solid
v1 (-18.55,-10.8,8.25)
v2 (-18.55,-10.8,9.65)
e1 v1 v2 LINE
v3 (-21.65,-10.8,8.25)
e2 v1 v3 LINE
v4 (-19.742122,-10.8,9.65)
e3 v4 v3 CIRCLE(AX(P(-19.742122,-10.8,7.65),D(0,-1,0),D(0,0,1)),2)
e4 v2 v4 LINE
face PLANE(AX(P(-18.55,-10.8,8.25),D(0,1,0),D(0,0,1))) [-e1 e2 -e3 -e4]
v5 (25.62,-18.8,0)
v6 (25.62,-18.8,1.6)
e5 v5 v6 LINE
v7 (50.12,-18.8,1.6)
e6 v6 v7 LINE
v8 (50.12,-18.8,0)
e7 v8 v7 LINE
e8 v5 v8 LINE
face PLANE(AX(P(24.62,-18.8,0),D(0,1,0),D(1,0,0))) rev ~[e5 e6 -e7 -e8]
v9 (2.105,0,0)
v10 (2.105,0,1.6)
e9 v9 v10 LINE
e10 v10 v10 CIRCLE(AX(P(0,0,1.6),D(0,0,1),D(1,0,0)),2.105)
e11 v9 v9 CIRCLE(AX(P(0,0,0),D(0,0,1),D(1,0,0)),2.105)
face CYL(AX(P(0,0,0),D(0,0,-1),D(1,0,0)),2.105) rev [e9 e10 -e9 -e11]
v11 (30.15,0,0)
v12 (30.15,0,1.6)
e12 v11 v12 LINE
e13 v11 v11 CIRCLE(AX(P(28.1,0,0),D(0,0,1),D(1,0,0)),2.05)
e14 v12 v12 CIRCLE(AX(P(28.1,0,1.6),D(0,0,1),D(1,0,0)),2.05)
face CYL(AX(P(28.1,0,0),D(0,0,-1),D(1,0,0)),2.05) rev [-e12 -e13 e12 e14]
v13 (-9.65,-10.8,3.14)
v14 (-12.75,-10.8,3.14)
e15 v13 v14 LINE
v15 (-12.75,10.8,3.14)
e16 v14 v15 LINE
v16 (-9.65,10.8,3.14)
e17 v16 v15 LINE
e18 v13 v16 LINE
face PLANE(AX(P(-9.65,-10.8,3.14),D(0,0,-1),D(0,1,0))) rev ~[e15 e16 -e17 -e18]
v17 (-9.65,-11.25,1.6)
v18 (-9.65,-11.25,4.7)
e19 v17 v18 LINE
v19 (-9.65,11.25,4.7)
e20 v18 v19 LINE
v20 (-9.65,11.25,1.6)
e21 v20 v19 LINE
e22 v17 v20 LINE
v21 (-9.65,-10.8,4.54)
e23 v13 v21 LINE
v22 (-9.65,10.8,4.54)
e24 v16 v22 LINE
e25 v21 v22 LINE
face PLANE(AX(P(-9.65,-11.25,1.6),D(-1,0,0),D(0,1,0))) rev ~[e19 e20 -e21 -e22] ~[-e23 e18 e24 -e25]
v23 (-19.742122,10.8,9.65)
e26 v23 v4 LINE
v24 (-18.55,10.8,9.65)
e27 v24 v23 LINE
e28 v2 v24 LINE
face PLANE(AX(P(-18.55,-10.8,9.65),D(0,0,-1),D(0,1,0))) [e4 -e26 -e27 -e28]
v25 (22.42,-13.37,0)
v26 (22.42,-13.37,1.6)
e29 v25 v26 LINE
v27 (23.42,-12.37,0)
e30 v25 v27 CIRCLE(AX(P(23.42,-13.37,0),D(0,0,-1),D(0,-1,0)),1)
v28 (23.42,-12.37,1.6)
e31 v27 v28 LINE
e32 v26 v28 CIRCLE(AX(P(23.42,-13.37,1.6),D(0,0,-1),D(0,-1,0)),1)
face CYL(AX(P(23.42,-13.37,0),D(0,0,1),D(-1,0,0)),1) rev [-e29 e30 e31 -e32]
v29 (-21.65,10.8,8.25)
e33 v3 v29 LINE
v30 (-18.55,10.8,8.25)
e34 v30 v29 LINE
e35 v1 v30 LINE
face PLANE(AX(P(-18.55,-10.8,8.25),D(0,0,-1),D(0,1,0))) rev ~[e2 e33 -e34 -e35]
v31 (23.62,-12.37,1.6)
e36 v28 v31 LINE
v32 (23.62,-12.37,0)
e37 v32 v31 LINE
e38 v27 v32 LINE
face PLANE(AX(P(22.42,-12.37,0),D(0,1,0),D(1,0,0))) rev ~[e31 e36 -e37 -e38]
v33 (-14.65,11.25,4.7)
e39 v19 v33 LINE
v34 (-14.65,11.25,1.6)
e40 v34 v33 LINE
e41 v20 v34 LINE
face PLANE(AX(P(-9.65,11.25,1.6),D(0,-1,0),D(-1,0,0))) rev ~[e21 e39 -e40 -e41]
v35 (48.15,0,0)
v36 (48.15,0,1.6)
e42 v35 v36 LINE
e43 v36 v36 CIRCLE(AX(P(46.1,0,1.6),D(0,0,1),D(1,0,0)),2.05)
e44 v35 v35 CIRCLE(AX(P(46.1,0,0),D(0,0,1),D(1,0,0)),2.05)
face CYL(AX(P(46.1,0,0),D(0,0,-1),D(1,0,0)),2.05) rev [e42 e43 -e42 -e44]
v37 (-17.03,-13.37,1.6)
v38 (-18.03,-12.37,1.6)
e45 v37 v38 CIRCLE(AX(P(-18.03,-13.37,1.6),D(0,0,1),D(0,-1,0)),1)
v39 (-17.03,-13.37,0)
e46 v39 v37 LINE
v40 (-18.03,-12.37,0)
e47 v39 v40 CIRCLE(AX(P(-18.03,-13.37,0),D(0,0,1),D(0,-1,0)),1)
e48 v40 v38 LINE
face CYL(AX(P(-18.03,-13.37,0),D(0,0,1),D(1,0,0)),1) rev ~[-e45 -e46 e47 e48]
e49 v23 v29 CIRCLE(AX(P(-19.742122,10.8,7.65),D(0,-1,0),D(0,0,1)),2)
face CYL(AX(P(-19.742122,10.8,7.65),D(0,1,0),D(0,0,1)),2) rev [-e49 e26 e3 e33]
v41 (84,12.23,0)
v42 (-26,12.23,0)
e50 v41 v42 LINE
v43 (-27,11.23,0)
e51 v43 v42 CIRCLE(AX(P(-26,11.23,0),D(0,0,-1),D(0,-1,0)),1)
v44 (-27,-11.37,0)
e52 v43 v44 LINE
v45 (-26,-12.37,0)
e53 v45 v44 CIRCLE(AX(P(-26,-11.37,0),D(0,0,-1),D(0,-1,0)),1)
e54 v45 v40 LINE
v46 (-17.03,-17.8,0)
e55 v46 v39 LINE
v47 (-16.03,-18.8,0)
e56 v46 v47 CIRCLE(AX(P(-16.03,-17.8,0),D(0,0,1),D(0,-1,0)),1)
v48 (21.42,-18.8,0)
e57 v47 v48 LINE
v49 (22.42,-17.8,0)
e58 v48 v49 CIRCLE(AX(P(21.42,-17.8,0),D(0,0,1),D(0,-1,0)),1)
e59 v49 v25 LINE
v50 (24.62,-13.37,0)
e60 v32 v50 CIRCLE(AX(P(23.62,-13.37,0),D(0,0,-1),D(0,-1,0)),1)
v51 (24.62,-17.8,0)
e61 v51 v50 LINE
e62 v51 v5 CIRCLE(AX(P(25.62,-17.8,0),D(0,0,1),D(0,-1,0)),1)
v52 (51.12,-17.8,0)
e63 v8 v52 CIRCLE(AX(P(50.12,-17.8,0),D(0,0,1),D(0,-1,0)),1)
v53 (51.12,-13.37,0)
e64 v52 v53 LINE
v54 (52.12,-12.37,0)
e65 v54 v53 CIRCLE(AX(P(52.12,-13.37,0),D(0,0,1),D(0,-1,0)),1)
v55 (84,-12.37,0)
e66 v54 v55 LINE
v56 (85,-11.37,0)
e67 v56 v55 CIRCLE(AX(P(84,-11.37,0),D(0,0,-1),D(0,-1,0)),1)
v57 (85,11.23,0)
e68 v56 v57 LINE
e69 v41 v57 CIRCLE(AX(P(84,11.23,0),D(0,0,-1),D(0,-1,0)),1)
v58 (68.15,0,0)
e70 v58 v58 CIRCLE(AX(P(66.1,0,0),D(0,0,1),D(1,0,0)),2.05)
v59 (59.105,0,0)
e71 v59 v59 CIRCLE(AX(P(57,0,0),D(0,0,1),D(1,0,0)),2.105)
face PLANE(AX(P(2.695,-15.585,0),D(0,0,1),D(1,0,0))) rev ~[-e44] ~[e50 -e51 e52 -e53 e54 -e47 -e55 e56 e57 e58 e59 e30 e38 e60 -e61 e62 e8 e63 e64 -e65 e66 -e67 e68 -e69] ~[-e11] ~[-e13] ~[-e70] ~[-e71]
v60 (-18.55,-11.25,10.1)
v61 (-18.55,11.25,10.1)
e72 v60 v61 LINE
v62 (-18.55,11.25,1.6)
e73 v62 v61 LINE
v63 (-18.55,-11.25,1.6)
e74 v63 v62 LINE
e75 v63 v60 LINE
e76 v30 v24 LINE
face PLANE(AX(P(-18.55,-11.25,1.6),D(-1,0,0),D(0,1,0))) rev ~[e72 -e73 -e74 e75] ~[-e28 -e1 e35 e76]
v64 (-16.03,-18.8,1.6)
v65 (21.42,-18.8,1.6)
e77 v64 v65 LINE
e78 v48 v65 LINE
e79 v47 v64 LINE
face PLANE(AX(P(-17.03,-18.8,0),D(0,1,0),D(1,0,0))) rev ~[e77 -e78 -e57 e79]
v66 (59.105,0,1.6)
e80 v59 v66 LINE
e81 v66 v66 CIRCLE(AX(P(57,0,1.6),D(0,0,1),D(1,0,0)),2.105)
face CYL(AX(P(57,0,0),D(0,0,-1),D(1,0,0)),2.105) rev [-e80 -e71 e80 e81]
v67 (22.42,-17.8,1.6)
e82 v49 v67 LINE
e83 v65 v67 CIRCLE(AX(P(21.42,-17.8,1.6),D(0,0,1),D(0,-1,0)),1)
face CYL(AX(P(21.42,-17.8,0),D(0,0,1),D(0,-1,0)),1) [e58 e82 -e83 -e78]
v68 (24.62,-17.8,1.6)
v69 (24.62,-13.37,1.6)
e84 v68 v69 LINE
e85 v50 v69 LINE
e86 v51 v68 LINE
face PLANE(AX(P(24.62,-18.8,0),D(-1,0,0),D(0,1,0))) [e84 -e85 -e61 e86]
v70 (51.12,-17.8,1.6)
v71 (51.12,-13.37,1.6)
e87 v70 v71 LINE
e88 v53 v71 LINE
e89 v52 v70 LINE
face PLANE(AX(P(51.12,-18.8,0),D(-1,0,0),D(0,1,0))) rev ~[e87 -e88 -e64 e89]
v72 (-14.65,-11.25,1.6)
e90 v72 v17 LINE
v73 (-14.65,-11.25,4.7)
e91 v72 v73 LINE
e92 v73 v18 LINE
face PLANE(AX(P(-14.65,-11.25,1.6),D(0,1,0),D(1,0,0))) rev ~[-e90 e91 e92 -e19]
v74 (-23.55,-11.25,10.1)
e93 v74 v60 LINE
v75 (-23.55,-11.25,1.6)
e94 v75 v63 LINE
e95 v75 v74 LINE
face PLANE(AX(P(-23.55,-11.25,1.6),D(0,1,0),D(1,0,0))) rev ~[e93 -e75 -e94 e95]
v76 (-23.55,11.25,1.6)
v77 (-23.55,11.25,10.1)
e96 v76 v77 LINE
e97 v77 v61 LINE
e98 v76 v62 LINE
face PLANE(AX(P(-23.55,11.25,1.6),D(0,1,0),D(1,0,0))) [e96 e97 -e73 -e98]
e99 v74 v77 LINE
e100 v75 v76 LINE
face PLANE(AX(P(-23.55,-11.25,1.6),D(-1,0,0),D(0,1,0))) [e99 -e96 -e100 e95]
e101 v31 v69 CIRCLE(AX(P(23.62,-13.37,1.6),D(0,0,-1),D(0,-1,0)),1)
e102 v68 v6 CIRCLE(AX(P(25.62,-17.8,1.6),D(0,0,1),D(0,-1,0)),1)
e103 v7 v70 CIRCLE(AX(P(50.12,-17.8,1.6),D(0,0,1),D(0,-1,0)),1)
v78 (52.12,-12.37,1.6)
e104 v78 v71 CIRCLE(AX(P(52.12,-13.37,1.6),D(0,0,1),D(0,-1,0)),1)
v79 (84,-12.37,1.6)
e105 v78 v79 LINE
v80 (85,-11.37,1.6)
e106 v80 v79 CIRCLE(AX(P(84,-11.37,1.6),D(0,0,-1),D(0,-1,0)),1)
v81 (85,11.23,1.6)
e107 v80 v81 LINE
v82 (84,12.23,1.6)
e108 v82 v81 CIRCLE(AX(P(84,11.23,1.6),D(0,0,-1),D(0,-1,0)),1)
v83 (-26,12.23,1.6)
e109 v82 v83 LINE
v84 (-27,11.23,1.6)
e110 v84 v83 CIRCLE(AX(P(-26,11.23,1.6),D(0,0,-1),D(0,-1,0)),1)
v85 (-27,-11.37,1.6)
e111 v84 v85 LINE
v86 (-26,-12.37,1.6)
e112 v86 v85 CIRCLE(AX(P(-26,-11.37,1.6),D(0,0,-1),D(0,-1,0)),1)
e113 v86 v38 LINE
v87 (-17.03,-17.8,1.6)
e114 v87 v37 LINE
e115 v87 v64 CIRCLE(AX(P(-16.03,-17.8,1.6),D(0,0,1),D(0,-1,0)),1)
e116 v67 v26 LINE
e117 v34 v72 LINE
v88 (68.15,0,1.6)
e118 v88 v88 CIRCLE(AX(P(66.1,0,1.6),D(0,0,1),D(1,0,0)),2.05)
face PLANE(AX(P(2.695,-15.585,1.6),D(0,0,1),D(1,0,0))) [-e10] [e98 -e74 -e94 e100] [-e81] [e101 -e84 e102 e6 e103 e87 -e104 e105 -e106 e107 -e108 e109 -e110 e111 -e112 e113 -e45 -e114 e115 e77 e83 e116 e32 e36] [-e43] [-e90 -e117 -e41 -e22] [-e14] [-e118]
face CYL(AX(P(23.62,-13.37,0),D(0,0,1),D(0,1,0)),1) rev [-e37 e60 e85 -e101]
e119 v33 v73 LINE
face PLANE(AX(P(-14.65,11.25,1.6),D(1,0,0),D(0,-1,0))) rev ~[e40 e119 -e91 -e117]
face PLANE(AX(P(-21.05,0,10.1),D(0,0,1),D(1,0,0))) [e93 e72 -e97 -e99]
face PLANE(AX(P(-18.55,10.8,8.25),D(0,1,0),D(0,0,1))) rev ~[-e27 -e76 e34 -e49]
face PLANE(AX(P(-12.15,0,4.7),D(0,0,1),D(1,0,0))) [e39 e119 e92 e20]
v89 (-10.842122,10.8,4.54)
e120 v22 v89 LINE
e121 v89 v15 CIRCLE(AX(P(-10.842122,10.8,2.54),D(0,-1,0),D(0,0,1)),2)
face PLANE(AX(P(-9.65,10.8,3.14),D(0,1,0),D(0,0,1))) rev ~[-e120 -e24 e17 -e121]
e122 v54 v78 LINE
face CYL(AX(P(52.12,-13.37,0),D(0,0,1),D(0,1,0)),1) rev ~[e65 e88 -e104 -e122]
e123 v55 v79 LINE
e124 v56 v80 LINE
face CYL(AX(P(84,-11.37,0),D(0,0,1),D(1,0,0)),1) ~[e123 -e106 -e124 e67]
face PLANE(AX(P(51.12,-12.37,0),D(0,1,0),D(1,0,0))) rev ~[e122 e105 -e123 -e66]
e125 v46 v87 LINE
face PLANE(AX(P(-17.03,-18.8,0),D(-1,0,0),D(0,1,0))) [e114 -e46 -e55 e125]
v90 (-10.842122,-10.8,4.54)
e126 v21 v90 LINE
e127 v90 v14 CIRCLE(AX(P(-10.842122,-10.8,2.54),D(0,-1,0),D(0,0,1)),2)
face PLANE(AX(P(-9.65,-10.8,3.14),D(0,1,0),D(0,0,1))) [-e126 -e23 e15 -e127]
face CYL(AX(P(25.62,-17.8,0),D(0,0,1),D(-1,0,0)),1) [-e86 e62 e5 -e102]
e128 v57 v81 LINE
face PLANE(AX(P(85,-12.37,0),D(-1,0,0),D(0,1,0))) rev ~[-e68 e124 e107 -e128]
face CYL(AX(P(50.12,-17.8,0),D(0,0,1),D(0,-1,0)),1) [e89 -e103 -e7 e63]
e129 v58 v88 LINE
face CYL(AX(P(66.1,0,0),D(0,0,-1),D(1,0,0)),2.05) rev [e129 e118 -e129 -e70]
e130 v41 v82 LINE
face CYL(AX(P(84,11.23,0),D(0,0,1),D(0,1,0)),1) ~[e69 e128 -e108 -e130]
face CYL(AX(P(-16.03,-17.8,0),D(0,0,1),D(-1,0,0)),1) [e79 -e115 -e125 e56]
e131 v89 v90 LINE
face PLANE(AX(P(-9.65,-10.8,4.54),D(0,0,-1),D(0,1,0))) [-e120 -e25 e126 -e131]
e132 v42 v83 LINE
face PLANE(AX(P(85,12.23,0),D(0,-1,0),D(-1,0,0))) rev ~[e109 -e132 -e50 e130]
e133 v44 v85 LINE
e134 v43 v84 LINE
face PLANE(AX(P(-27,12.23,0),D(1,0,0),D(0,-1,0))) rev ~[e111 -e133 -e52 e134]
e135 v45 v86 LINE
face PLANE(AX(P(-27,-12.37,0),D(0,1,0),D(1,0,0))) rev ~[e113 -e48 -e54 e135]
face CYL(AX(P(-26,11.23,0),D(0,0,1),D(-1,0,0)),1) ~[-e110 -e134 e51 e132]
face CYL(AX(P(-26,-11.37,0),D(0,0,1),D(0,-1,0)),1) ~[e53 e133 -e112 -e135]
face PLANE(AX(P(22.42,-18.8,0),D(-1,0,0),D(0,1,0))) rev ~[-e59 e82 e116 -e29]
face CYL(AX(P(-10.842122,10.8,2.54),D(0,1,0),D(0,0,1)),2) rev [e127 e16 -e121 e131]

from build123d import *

# Parameters (mm, degrees)
F4_W         = 39.45
F4_H         = 6.43
F4_W_2       = 26.5
F4_R         = 2.105
F4_R_2       = 2.05
F5_DEPTH     = 1.6
F7_DEPTH     = 3.1
F6_W         = 5
F6_H         = 22.5
F8_DEPTH     = 8.5
F9_R         = 1
F10_W        = 21.6
F10_H        = 1.4
F11_DEPTH    = 3.1
F12_T1_DEPTH = 21.6
F13_W        = 21.6
F13_H        = 1.4
F14_DEPTH    = 3.1
F15_T1_DEPTH = 21.6


# Not quite as in the source:
# - a fillet or chamfer that OpenCascade refuses, or shapes differently, is made with other operations: its cross-section is extruded or revolved along the edge and cut away or added
# - a feature names something its author has since deleted; it is built from what else it names


with BuildPart() as f5:
    # F4 (on Top) → F5 (new body)
    with BuildSketch(Plane.XY):
        with Locations((2.695, -15.585)):
            Rectangle(F4_W, F4_H)
        with Locations((37.87, -15.585)):
            Rectangle(F4_W_2, F4_H)
        Polygon((85, 12.23), (-27, 12.23), (-27, -12.37), (-17.03, -12.37), (22.42, -12.37), (24.62, -12.37), (51.12, -12.37), (85, -12.37), align=None)
        Circle(F4_R, mode=Mode.SUBTRACT)
        with Locations((28.1, 0)):
            Circle(F4_R_2, mode=Mode.SUBTRACT)
        with Locations((46.1, 0)):
            Circle(F4_R_2, mode=Mode.SUBTRACT)
        with Locations((57, 0)):
            Circle(F4_R, mode=Mode.SUBTRACT)
        with Locations((66.1, 0)):
            Circle(F4_R_2, mode=Mode.SUBTRACT)
    extrude(amount=F5_DEPTH)

    # F6 (on face) → F7 (join)
    with BuildSketch(Plane.XY.offset(1.6)):
        Polygon((-9.65, 11.25), (-14.65, 11.25), (-14.65, -11.25), (-9.65, -11.25), (-9.65, 0), align=None)
    extrude(amount=F7_DEPTH)

    # F6 (on face) → F8 (join)
    with BuildSketch(Plane.XY.offset(1.6)):
        with Locations((-21.05, 0)):
            Rectangle(F6_W, F6_H)
    extrude(amount=F8_DEPTH)

    # F9
    f9_edges = [f5.edges().sort_by_distance(p)[0] for p in [
        (-27, -12.37, 0.8),
        (-17.03, -12.37, 0.8),
        (-17.03, -18.8, 0.8),
        (24.62, -12.37, 0.8),
        (24.62, -18.8, 0.8),
        (22.42, -18.8, 0.8),
        (51.12, -18.8, 0.8),
        (22.42, -12.37, 0.8),
        (51.12, -12.37, 0.8),
        (85, 12.23, 0.8),
        (-27, 12.23, 0.8),
        (85, -12.37, 0.8),
    ]]
    fillet(f9_edges, radius=F9_R)

    # F10 (on face) → F11 (cut)
    with BuildSketch(Plane.YZ.offset(-9.65)):
        with Locations((0, 3.84)):
            Rectangle(F10_W, F10_H)
    extrude(amount=-F11_DEPTH, mode=Mode.SUBTRACT)

    # F12: fillet of radius 2 on 1 edges, made by hand

    # F12_s2 → F12_t1 (join)
    with BuildSketch(Plane.XZ.offset(-10.8)):
        with BuildLine():
            ThreePointArc((-10.8421215972, 4.54), (-12.0253375538, 4.1524515497), (-12.75, 3.14))
            Line((-12.75, 3.14), (-12.75, 4.54))
            Line((-12.75, 4.54), (-10.8421215972, 4.54))
        make_face()
    extrude(amount=F12_T1_DEPTH)

    # F13 (on face) → F14 (cut)
    with BuildSketch(Plane.YZ.offset(-18.55)):
        with Locations((0, 8.95)):
            Rectangle(F13_W, F13_H)
    extrude(amount=-F14_DEPTH, mode=Mode.SUBTRACT)

    # F15: fillet of radius 2 on 1 edges, made by hand

    # F15_s2 → F15_t1 (join)
    with BuildSketch(Plane.XZ.offset(-10.8)):
        with BuildLine():
            ThreePointArc((-19.7421215972, 9.65), (-20.9253375538, 9.2624515497), (-21.65, 8.25))
            Line((-21.65, 8.25), (-21.65, 9.65))
            Line((-21.65, 9.65), (-19.7421215972, 9.65))
        make_face()
    extrude(amount=F15_T1_DEPTH)


solid = f5.part
